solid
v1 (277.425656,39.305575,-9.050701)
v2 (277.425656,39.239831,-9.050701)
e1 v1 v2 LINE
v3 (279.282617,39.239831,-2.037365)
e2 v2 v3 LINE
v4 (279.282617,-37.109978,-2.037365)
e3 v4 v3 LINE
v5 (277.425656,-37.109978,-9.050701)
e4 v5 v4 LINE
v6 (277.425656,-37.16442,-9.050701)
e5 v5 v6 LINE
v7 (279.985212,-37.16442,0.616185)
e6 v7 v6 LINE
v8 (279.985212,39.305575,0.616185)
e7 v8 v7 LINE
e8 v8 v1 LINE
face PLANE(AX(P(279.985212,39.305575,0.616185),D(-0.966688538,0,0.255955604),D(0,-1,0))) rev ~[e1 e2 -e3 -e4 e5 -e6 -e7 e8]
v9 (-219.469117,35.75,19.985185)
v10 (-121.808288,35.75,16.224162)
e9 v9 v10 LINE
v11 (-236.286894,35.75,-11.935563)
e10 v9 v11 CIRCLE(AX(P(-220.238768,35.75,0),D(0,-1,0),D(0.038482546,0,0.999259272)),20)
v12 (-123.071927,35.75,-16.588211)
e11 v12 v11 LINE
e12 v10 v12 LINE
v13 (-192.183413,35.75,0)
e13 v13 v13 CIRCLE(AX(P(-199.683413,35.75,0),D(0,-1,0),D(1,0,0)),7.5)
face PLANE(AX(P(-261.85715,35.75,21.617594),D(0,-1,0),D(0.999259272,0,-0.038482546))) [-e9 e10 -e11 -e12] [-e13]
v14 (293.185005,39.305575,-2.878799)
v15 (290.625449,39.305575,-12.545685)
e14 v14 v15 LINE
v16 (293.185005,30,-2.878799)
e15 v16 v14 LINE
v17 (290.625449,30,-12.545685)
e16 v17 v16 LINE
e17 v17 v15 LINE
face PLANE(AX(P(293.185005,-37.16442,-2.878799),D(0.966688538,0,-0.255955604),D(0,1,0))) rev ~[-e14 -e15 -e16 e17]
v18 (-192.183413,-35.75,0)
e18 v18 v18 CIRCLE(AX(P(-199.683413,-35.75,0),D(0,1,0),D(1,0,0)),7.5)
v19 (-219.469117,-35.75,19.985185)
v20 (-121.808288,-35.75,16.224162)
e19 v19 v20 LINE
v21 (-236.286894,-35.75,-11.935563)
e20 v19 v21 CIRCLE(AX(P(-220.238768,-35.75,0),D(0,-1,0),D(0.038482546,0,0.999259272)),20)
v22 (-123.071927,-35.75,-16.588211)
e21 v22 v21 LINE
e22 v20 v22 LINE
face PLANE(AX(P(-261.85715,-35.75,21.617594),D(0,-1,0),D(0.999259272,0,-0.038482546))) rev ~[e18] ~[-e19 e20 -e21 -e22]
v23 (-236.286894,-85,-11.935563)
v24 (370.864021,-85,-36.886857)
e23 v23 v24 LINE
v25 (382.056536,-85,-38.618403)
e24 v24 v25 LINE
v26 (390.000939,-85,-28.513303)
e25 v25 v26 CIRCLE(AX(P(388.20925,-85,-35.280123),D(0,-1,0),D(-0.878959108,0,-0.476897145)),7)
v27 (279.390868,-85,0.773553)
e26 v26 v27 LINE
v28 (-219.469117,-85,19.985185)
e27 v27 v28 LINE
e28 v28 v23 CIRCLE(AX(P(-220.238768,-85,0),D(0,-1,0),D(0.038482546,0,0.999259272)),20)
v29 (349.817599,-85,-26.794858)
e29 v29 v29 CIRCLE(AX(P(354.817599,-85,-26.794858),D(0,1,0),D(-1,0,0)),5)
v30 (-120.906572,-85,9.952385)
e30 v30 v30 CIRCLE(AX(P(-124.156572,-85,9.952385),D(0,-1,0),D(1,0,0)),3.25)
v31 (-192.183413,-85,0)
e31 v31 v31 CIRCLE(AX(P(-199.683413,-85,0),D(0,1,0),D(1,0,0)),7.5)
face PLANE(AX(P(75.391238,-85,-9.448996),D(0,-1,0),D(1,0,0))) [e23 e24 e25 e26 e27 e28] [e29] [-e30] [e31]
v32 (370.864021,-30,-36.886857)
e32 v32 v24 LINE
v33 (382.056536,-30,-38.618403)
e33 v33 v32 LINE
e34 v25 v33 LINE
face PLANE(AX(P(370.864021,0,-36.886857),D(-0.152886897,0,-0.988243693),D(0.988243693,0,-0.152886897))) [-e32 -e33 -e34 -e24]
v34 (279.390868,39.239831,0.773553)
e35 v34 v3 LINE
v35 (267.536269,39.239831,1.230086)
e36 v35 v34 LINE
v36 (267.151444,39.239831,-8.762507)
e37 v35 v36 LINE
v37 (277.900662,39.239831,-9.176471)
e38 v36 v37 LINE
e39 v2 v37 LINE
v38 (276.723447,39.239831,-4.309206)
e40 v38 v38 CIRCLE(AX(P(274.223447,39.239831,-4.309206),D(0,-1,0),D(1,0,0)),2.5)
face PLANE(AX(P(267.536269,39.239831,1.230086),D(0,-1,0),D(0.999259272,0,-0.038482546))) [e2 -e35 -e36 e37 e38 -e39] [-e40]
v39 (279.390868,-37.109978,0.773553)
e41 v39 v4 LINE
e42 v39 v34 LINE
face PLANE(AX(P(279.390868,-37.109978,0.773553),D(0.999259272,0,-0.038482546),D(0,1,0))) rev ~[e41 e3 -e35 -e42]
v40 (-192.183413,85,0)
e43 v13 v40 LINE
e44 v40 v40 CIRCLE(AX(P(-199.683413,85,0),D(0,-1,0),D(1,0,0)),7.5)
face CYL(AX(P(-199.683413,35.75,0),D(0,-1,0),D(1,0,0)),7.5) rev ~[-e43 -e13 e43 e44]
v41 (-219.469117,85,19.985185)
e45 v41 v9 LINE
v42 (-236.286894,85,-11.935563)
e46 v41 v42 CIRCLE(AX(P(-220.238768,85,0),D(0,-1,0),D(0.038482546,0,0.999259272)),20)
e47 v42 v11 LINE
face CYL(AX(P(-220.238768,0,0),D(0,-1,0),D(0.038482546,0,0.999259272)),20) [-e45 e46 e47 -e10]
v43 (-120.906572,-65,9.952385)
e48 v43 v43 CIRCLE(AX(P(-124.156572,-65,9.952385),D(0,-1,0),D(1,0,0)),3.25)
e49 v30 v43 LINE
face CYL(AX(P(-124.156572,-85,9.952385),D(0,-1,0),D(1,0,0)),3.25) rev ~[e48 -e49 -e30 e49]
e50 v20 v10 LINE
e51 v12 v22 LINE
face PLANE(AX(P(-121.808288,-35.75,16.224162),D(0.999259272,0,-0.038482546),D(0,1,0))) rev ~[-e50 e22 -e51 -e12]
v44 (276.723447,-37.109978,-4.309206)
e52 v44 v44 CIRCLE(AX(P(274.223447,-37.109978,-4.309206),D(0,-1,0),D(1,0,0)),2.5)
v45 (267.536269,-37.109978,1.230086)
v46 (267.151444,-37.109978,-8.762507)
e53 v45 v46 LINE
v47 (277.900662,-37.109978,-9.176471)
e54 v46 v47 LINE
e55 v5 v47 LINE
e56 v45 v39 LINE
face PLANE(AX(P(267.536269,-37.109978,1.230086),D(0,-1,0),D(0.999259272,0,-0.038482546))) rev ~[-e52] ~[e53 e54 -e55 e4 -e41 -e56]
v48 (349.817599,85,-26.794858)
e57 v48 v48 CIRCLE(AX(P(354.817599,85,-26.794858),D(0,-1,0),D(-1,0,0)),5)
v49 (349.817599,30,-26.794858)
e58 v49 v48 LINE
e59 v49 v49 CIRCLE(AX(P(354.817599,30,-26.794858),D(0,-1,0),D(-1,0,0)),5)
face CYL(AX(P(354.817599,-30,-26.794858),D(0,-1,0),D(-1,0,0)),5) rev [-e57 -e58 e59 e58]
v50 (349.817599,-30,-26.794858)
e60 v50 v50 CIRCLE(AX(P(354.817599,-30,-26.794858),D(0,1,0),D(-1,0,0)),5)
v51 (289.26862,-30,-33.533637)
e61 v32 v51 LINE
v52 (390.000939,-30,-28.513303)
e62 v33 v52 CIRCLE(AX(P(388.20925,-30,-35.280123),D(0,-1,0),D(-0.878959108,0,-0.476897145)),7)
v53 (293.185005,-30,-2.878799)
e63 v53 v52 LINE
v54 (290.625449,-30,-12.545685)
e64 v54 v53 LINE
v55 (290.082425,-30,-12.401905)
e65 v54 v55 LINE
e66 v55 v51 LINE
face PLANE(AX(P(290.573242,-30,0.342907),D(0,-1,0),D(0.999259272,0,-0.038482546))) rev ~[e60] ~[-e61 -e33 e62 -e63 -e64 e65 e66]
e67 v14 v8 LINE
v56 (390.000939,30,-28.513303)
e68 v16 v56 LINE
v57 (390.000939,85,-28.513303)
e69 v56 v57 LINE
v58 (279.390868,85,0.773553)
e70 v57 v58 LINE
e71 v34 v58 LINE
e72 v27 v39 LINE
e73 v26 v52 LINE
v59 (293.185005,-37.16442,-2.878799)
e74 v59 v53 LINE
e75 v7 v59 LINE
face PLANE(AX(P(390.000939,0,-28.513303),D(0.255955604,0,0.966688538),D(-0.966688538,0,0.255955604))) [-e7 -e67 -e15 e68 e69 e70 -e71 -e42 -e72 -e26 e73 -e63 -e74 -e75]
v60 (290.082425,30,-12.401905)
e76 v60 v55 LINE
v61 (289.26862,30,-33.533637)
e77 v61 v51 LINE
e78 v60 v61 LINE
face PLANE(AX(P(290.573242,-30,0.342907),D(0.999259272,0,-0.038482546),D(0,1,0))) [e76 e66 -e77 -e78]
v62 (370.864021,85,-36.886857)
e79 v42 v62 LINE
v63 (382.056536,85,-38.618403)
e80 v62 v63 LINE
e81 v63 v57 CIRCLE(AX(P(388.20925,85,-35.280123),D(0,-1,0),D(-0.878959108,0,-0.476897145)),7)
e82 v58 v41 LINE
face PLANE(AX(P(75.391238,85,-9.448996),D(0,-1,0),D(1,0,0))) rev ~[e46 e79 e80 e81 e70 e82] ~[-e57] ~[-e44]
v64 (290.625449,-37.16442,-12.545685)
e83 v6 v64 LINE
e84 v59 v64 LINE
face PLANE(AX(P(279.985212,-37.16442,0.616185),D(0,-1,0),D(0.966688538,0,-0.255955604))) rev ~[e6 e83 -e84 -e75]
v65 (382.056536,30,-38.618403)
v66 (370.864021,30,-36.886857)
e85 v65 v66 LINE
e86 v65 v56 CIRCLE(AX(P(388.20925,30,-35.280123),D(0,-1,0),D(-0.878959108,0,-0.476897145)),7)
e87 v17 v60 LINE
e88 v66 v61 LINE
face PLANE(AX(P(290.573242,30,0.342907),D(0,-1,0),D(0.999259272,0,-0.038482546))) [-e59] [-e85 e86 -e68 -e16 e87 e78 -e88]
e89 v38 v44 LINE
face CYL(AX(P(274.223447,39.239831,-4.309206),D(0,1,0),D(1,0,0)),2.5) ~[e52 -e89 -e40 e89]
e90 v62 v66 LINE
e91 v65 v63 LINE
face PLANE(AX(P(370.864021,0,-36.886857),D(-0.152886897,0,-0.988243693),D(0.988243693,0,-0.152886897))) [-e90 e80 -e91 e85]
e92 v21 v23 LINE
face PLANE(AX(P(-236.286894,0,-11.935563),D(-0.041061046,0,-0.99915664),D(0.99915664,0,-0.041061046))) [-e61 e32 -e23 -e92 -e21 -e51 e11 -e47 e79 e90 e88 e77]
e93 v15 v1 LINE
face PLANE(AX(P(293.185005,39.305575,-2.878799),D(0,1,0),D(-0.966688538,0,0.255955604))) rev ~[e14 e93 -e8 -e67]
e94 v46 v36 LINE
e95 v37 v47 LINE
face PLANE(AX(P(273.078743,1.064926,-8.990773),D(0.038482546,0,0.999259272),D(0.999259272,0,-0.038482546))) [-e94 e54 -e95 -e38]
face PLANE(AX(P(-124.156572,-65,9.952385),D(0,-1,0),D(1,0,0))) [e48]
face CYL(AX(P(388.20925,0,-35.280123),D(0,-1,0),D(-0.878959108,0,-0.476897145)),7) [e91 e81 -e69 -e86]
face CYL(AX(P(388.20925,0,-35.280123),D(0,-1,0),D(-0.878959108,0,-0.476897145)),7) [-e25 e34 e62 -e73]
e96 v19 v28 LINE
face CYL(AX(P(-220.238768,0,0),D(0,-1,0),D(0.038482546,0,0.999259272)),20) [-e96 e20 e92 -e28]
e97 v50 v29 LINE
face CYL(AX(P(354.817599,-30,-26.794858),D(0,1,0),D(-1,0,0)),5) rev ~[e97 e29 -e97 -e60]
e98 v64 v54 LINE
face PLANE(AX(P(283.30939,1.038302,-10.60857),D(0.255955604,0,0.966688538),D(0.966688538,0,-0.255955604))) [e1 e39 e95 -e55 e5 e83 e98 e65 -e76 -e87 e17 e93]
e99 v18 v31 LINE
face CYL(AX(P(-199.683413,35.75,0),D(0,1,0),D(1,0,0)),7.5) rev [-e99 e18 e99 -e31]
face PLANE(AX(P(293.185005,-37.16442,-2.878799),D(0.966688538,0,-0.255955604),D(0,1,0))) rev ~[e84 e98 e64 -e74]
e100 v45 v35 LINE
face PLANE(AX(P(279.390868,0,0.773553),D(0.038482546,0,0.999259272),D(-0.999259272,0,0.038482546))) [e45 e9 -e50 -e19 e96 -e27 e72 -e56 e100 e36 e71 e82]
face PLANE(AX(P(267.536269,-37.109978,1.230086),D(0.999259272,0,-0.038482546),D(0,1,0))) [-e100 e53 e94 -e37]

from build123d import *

# Parameters (mm, degrees)
F1_DEPTH      = 85
F2_W          = 140.1526774555
F2_H          = 71.5
F2_W_2        = 166.0307588987
F2_H_2        = 60
F3_DEPTH      = 60
F4_R          = 5
F5_DEPTH      = 115.001
F5_DEPTH_BACK = 55.001
F6_R          = 7.5
F7_DEPTH      = 120.751
F7_DEPTH_BACK = 49.251
F8_W          = 2.8015428152
F8_H          = 60
F9_DEPTH      = 10
F11_W         = 11.8633863517
F11_H         = 76.3498097658
F12_DEPTH     = 10
F13_R         = 2.5
F14_DEPTH     = 76.3498097658
F15_R         = 3.25
F16_DEPTH     = 20


# Not quite as in the source:
# - a feature of the source that left no trace in its solid (it failed there, or was rolled back) is left out
# - a feature names something its author has since deleted; it is built from what else it names


with BuildPart() as f1:
    # F0 (on Front) → F1 (new body, symmetric)
    with BuildSketch(Plane.XZ):
        with BuildLine():
            Line((279.3908679786, 0.7735525745), (-219.4691173488, 19.9851854498))
            ThreePointArc((-219.4691173488, 19.9851854498), (-237.9331597041, 9.3224734741), (-236.2868942017, -11.9355625752))
            Line((-236.2868942017, -11.9355625752), (370.8640205953, -36.8868572182))
            Line((370.8640205953, -36.8868572182), (382.0565363882, -38.6184028055))
            ThreePointArc((382.0565363882, -38.6184028055), (393.7122397041, -39.6064498563), (390.0009393692, -28.5133030266))
            Line((390.0009393692, -28.5133030266), (279.3908679786, 0.7735525745))
        make_face()
    extrude(amount=F1_DEPTH, both=True)

    # F2 (on face) → F3 (cut)
    with BuildSketch(Plane(origin=(0.44349793, 0, 11.5161148616), x_dir=(0.9992592725, 0, -0.0384825459), z_dir=(0.0384825459, 0, 0.9992592725))):
        with Locations((-192.4187466502, 0)):
            Rectangle(F2_W, F2_H)
        with Locations((373.3601896558, 0)):
            Rectangle(F2_W_2, F2_H_2)
    extrude(amount=-F3_DEPTH, mode=Mode.SUBTRACT)

    # F4 (on face) → F5 (cut, two sides)
    with BuildSketch(Plane(origin=(0, -30, 0), x_dir=(-1, 0, 0), z_dir=(0, 1, 0))) as f5_sk:
        with Locations((-354.8175990582, -26.7948582768)):
            Circle(F4_R)
    extrude(amount=F5_DEPTH, mode=Mode.SUBTRACT)
    extrude(f5_sk.sketch, amount=-F5_DEPTH_BACK, mode=Mode.SUBTRACT)

    # F6 (on face) → F7 (cut, two sides)
    with BuildSketch(Plane.XZ.offset(-35.75)) as f7_sk:
        with Locations((-199.6834129095, 0)):
            Circle(F6_R)
    extrude(amount=F7_DEPTH, mode=Mode.SUBTRACT)
    extrude(f7_sk.sketch, amount=-F7_DEPTH_BACK, mode=Mode.SUBTRACT)

    # F8 (on face) → F9 (cut)
    with BuildSketch(Plane(origin=(18.495209297, 0, 69.8523750243), x_dir=(0.9666885377, 0, -0.2559556038), z_dir=(0.2559556038, 0, 0.9666885377))):
        Polygon((270.5007791519, -37.1644198895), (284.1554284096, -37.1644198895), (284.1554284096, -30), (281.3538855944, -30), (281.3538855944, 30), (284.1554284096, 30), (284.1554284096, 39.305575192), (270.5007791519, 39.305575192), align=None)
        with Locations((282.754657002, 0)):
            Rectangle(F8_W, F8_H)
    extrude(amount=-F9_DEPTH, mode=Mode.SUBTRACT)

    # F11 (on face) → F12 (cut)
    with BuildSketch(Plane(origin=(0.44349793, 0, 11.5161148616), x_dir=(0.9992592725, 0, -0.0384825459), z_dir=(0.0384825459, 0, 0.9992592725))):
        with Locations((273.2224540287, 1.0649263859)):
            Rectangle(F11_W, F11_H)
    extrude(amount=-F12_DEPTH, mode=Mode.SUBTRACT)

    # F13 (on face) → F14 (join, through all)
    with BuildSketch(Plane.XZ.offset(-39.2398312688)):
        with Locations((274.223446846, -4.3092062697)):
            Circle(F13_R)
    extrude(amount=F14_DEPTH)

    # F15 (on face) → F16 (cut)
    with BuildSketch(Plane.XZ.offset(85)):
        with Locations((-124.1565719247, 9.9523849785)):
            Circle(F15_R)
    extrude(amount=-F16_DEPTH, mode=Mode.SUBTRACT)


solid = f1.part
